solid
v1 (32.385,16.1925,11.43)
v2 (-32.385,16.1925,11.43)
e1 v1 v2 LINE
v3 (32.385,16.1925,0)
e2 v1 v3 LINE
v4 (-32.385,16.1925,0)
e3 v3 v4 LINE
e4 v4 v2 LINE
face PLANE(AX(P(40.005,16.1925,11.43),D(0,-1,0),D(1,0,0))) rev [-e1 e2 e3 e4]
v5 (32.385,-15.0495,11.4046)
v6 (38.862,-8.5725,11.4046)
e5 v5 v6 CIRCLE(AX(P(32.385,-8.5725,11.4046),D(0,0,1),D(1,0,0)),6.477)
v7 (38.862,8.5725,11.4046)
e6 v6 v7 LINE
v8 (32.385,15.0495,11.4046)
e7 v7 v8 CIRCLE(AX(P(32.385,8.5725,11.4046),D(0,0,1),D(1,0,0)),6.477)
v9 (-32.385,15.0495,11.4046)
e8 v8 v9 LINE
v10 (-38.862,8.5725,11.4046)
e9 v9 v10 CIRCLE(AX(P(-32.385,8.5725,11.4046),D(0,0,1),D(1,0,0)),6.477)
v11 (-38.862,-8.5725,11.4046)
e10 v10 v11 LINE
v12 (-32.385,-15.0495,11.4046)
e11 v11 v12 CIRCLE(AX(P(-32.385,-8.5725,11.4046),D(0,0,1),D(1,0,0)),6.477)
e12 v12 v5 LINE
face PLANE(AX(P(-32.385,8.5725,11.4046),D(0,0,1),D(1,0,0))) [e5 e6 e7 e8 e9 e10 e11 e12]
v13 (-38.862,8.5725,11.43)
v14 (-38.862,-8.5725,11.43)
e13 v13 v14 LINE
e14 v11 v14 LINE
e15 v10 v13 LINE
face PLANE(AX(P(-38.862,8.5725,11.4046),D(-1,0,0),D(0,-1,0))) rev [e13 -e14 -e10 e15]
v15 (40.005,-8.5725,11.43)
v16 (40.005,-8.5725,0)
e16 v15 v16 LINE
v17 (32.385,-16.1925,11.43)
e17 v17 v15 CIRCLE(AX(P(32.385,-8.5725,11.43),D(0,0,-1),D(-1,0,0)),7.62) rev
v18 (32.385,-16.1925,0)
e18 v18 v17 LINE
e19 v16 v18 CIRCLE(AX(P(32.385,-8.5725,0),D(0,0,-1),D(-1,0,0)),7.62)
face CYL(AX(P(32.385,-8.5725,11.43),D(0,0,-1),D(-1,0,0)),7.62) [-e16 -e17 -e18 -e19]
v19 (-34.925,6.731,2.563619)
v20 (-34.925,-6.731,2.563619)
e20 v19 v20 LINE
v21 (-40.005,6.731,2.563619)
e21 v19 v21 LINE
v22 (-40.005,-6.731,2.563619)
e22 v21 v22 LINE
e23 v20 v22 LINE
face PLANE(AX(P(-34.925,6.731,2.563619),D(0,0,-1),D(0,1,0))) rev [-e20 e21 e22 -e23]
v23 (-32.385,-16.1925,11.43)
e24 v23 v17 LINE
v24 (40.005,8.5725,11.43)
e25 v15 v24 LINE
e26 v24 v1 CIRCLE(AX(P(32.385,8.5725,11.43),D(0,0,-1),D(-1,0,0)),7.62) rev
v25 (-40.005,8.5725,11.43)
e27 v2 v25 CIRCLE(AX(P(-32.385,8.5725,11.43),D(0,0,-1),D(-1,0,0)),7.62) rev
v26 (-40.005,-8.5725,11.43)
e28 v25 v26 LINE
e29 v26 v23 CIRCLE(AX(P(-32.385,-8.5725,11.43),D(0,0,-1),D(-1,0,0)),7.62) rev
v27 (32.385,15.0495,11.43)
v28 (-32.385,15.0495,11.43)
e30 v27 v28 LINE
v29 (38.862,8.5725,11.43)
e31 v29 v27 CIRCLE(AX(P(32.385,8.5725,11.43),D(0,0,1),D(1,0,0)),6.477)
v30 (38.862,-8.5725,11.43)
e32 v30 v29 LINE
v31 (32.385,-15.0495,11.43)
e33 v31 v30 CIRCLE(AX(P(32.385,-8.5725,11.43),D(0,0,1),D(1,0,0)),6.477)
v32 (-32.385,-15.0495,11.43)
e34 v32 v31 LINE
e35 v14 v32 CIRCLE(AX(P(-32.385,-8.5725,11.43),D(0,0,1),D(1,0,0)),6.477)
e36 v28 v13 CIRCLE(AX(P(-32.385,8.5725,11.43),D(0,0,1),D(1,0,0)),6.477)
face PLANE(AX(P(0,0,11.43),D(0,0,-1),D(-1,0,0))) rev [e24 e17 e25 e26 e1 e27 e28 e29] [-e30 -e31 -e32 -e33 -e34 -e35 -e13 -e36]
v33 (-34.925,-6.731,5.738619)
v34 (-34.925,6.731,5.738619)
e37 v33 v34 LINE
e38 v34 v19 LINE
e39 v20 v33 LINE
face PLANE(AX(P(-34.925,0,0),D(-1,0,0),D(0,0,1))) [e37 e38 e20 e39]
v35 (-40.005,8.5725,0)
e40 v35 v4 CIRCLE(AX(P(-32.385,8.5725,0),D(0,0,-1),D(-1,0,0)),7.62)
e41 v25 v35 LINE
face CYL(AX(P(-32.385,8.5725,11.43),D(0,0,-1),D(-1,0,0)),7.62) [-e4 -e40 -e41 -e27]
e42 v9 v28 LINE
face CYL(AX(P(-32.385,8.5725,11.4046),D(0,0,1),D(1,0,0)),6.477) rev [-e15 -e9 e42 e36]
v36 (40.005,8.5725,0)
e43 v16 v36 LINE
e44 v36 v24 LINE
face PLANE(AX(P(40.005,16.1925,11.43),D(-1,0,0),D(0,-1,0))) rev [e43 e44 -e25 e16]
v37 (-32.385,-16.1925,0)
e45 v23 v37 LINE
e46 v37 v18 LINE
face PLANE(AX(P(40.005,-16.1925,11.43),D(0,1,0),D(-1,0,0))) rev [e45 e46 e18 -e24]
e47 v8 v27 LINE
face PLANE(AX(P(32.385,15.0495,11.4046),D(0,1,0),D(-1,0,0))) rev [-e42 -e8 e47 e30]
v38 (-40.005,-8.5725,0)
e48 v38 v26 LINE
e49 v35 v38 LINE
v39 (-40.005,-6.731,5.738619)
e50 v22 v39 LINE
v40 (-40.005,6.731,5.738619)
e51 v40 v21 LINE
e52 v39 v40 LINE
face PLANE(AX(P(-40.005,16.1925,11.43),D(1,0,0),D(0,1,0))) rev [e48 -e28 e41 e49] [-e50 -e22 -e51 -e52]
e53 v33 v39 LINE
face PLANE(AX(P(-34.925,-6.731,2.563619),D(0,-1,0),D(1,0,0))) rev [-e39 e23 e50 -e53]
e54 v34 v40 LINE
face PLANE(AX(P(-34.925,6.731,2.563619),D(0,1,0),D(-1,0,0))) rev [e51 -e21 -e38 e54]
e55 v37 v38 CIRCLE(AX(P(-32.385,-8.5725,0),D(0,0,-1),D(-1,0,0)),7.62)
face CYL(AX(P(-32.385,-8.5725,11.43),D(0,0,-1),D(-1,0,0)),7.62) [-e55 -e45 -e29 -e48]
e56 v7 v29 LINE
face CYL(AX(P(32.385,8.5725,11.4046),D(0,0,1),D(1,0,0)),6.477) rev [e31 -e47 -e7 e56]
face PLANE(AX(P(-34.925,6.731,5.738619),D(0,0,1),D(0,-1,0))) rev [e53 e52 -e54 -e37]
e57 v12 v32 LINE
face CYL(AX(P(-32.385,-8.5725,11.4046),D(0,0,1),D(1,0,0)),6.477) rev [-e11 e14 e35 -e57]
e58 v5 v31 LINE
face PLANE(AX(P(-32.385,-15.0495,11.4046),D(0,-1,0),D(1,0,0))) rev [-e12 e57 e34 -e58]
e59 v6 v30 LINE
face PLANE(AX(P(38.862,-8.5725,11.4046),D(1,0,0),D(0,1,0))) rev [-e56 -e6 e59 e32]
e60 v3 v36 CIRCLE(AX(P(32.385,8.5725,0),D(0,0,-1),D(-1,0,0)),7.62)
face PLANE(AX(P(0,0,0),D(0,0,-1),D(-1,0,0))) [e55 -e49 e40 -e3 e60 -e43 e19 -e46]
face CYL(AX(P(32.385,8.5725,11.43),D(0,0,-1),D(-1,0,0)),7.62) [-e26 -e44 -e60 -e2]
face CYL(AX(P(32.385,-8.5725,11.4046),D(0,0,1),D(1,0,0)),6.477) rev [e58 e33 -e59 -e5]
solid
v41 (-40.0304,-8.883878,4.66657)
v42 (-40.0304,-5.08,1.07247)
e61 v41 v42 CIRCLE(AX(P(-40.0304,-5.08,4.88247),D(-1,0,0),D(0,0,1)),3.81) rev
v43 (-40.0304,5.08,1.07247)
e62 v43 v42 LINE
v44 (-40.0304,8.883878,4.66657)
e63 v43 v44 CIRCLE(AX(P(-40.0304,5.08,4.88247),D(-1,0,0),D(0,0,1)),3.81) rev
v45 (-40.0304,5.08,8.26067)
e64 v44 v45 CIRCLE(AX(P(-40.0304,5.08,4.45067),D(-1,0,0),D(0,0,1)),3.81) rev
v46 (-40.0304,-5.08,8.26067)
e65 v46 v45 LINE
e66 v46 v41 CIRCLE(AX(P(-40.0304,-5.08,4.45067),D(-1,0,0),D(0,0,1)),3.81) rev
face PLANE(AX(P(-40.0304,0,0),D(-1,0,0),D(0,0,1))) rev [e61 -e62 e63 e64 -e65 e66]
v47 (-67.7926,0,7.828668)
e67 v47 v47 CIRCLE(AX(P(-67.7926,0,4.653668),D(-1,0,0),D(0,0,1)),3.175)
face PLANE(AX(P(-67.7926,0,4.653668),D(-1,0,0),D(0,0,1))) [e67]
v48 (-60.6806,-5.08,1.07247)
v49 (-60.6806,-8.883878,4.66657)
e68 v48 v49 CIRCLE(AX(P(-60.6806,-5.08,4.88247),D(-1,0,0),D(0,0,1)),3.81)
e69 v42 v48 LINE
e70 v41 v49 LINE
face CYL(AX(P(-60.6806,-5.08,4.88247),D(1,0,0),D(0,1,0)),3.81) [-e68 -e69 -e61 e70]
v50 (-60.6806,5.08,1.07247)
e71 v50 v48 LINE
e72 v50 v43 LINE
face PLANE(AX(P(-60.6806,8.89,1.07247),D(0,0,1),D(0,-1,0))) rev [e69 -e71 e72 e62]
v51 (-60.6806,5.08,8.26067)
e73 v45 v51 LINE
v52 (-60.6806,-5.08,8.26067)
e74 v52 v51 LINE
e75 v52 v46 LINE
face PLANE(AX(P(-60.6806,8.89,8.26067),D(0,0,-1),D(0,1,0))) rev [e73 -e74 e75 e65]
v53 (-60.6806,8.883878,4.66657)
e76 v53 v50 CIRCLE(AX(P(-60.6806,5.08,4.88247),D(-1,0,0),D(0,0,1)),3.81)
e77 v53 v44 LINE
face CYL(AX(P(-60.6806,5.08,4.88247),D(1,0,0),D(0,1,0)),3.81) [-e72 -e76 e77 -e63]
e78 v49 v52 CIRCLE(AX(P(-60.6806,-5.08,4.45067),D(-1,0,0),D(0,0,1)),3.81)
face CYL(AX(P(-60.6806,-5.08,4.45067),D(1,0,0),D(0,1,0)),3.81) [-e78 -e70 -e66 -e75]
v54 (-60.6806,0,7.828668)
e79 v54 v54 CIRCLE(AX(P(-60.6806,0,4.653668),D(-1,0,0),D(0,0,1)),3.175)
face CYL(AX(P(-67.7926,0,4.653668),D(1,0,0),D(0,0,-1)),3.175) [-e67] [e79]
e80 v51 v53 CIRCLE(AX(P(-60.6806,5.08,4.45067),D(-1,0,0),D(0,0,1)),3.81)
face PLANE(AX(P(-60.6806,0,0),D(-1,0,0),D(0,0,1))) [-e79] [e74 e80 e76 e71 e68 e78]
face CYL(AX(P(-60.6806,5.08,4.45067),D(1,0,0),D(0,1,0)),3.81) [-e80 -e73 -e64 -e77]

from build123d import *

# Parameters (mm, degrees)
SKETCH2_W           = 80.01
SKETCH2_H           = 32.385
BOSS_EXTRUDE1_DEPTH = 11.43
FILLET1_R           = 7.62
CUT_EXTRUDE1_DEPTH  = 0.0254
SKETCH5_W           = 3.175
SKETCH5_H           = 13.462
CUT_EXTRUDE2_DEPTH  = 5.08
BOSS_EXTRUDE2_START = 0.0254
SKETCH6_W           = 7.1882
SKETCH6_H           = 17.78
BOSS_EXTRUDE2_DEPTH = 20.6502
FILLET2_R           = 3.81
SKETCH7_R           = 3.175
BOSS_EXTRUDE3_DEPTH = 7.112


with BuildPart() as part:
    # Sketch2 → Boss-Extrude1 (new body)
    with BuildSketch(Plane.XY):
        Rectangle(SKETCH2_W, SKETCH2_H)
    extrude(amount=BOSS_EXTRUDE1_DEPTH)

    # Fillet1
    fillet1_edges = [part.edges().sort_by_distance(p)[0] for p in [
        (-40.005, 16.1925, 5.715),
        (40.005, 16.1925, 5.715),
        (40.005, -16.1925, 5.715),
        (-40.005, -16.1925, 5.715),
    ]]
    fillet(fillet1_edges, radius=FILLET1_R)

    # Sketch4 → Cut-Extrude1 (cut)
    with BuildSketch(Plane.XY.offset(11.43)):
        with BuildLine():
            Line((-38.862, 8.5725), (-38.862, -8.5725))
            ThreePointArc((-38.862, -8.5725), (-36.964930622, -13.152430622), (-32.385, -15.0495))
            Line((-32.385, -15.0495), (32.385, -15.0495))
            ThreePointArc((32.385, -15.0495), (36.964930622, -13.152430622), (38.862, -8.5725))
            Line((38.862, -8.5725), (38.862, 8.5725))
            ThreePointArc((38.862, 8.5725), (36.964930622, 13.152430622), (32.385, 15.0495))
            Line((32.385, 15.0495), (-32.385, 15.0495))
            ThreePointArc((-32.385, 15.0495), (-36.964930622, 13.152430622), (-38.862, 8.5725))
        make_face()
    extrude(amount=-CUT_EXTRUDE1_DEPTH, mode=Mode.SUBTRACT)

    # Sketch5 → Cut-Extrude2 (cut)
    with BuildSketch(Plane.ZY.offset(40.005)):
        with Locations((4.151118715, 0)):
            Rectangle(SKETCH5_W, SKETCH5_H)
    extrude(amount=-CUT_EXTRUDE2_DEPTH, mode=Mode.SUBTRACT)


with BuildPart() as body_2:
    # Sketch6 → Boss-Extrude2 (new body)
    with BuildSketch(Plane.ZY.offset(40.005).offset(BOSS_EXTRUDE2_START)):
        with Locations((4.666570246, 0)):
            Rectangle(SKETCH6_W, SKETCH6_H)
    extrude(amount=BOSS_EXTRUDE2_DEPTH)

    # Fillet2
    # the kernel refuses this fillet: 3.81 mm, written as the material it takes off along each edge
    with BuildSketch(Plane(origin=(-30.5054, -8.89, 1.072470246), x_dir=(0, 0, 1), z_dir=(-1, 0, 0)), Plane(origin=(-30.5054, -8.89, 8.260670246), x_dir=(0, 1, 0), z_dir=(-1, 0, 0)), Plane(origin=(-30.5054, 8.89, 8.260670246), x_dir=(0, 0, -1), z_dir=(-1, 0, 0))) as fillet2_piece_1:
        with BuildLine():
            CenterArc((FILLET2_R, FILLET2_R), FILLET2_R, 180, 90)
            Line((0, FILLET2_R), (0, 0))
            Line((0, 0), (FILLET2_R, 0))
        make_face()
    extrude(amount=39.7002, mode=Mode.SUBTRACT)
    with BuildSketch(Plane(origin=(-30.5054, 8.89, 1.072470246), x_dir=(0, 0, 1), z_dir=(-1, 0, 0))) as fillet2_piece_2:
        with BuildLine():
            CenterArc((FILLET2_R, -FILLET2_R), FILLET2_R, 90, 90)
            Line((0, -FILLET2_R), (0, 0))
            Line((0, 0), (FILLET2_R, 0))
        make_face()
    extrude(amount=39.7002, mode=Mode.SUBTRACT)

    # Sketch7 → Boss-Extrude3 (add)
    with BuildSketch(Plane.ZY.offset(60.6806)):
        with Locations((4.653668075, 0)):
            Circle(SKETCH7_R)
    extrude(amount=BOSS_EXTRUDE3_DEPTH)


solid = Compound([part.part, body_2.part])
